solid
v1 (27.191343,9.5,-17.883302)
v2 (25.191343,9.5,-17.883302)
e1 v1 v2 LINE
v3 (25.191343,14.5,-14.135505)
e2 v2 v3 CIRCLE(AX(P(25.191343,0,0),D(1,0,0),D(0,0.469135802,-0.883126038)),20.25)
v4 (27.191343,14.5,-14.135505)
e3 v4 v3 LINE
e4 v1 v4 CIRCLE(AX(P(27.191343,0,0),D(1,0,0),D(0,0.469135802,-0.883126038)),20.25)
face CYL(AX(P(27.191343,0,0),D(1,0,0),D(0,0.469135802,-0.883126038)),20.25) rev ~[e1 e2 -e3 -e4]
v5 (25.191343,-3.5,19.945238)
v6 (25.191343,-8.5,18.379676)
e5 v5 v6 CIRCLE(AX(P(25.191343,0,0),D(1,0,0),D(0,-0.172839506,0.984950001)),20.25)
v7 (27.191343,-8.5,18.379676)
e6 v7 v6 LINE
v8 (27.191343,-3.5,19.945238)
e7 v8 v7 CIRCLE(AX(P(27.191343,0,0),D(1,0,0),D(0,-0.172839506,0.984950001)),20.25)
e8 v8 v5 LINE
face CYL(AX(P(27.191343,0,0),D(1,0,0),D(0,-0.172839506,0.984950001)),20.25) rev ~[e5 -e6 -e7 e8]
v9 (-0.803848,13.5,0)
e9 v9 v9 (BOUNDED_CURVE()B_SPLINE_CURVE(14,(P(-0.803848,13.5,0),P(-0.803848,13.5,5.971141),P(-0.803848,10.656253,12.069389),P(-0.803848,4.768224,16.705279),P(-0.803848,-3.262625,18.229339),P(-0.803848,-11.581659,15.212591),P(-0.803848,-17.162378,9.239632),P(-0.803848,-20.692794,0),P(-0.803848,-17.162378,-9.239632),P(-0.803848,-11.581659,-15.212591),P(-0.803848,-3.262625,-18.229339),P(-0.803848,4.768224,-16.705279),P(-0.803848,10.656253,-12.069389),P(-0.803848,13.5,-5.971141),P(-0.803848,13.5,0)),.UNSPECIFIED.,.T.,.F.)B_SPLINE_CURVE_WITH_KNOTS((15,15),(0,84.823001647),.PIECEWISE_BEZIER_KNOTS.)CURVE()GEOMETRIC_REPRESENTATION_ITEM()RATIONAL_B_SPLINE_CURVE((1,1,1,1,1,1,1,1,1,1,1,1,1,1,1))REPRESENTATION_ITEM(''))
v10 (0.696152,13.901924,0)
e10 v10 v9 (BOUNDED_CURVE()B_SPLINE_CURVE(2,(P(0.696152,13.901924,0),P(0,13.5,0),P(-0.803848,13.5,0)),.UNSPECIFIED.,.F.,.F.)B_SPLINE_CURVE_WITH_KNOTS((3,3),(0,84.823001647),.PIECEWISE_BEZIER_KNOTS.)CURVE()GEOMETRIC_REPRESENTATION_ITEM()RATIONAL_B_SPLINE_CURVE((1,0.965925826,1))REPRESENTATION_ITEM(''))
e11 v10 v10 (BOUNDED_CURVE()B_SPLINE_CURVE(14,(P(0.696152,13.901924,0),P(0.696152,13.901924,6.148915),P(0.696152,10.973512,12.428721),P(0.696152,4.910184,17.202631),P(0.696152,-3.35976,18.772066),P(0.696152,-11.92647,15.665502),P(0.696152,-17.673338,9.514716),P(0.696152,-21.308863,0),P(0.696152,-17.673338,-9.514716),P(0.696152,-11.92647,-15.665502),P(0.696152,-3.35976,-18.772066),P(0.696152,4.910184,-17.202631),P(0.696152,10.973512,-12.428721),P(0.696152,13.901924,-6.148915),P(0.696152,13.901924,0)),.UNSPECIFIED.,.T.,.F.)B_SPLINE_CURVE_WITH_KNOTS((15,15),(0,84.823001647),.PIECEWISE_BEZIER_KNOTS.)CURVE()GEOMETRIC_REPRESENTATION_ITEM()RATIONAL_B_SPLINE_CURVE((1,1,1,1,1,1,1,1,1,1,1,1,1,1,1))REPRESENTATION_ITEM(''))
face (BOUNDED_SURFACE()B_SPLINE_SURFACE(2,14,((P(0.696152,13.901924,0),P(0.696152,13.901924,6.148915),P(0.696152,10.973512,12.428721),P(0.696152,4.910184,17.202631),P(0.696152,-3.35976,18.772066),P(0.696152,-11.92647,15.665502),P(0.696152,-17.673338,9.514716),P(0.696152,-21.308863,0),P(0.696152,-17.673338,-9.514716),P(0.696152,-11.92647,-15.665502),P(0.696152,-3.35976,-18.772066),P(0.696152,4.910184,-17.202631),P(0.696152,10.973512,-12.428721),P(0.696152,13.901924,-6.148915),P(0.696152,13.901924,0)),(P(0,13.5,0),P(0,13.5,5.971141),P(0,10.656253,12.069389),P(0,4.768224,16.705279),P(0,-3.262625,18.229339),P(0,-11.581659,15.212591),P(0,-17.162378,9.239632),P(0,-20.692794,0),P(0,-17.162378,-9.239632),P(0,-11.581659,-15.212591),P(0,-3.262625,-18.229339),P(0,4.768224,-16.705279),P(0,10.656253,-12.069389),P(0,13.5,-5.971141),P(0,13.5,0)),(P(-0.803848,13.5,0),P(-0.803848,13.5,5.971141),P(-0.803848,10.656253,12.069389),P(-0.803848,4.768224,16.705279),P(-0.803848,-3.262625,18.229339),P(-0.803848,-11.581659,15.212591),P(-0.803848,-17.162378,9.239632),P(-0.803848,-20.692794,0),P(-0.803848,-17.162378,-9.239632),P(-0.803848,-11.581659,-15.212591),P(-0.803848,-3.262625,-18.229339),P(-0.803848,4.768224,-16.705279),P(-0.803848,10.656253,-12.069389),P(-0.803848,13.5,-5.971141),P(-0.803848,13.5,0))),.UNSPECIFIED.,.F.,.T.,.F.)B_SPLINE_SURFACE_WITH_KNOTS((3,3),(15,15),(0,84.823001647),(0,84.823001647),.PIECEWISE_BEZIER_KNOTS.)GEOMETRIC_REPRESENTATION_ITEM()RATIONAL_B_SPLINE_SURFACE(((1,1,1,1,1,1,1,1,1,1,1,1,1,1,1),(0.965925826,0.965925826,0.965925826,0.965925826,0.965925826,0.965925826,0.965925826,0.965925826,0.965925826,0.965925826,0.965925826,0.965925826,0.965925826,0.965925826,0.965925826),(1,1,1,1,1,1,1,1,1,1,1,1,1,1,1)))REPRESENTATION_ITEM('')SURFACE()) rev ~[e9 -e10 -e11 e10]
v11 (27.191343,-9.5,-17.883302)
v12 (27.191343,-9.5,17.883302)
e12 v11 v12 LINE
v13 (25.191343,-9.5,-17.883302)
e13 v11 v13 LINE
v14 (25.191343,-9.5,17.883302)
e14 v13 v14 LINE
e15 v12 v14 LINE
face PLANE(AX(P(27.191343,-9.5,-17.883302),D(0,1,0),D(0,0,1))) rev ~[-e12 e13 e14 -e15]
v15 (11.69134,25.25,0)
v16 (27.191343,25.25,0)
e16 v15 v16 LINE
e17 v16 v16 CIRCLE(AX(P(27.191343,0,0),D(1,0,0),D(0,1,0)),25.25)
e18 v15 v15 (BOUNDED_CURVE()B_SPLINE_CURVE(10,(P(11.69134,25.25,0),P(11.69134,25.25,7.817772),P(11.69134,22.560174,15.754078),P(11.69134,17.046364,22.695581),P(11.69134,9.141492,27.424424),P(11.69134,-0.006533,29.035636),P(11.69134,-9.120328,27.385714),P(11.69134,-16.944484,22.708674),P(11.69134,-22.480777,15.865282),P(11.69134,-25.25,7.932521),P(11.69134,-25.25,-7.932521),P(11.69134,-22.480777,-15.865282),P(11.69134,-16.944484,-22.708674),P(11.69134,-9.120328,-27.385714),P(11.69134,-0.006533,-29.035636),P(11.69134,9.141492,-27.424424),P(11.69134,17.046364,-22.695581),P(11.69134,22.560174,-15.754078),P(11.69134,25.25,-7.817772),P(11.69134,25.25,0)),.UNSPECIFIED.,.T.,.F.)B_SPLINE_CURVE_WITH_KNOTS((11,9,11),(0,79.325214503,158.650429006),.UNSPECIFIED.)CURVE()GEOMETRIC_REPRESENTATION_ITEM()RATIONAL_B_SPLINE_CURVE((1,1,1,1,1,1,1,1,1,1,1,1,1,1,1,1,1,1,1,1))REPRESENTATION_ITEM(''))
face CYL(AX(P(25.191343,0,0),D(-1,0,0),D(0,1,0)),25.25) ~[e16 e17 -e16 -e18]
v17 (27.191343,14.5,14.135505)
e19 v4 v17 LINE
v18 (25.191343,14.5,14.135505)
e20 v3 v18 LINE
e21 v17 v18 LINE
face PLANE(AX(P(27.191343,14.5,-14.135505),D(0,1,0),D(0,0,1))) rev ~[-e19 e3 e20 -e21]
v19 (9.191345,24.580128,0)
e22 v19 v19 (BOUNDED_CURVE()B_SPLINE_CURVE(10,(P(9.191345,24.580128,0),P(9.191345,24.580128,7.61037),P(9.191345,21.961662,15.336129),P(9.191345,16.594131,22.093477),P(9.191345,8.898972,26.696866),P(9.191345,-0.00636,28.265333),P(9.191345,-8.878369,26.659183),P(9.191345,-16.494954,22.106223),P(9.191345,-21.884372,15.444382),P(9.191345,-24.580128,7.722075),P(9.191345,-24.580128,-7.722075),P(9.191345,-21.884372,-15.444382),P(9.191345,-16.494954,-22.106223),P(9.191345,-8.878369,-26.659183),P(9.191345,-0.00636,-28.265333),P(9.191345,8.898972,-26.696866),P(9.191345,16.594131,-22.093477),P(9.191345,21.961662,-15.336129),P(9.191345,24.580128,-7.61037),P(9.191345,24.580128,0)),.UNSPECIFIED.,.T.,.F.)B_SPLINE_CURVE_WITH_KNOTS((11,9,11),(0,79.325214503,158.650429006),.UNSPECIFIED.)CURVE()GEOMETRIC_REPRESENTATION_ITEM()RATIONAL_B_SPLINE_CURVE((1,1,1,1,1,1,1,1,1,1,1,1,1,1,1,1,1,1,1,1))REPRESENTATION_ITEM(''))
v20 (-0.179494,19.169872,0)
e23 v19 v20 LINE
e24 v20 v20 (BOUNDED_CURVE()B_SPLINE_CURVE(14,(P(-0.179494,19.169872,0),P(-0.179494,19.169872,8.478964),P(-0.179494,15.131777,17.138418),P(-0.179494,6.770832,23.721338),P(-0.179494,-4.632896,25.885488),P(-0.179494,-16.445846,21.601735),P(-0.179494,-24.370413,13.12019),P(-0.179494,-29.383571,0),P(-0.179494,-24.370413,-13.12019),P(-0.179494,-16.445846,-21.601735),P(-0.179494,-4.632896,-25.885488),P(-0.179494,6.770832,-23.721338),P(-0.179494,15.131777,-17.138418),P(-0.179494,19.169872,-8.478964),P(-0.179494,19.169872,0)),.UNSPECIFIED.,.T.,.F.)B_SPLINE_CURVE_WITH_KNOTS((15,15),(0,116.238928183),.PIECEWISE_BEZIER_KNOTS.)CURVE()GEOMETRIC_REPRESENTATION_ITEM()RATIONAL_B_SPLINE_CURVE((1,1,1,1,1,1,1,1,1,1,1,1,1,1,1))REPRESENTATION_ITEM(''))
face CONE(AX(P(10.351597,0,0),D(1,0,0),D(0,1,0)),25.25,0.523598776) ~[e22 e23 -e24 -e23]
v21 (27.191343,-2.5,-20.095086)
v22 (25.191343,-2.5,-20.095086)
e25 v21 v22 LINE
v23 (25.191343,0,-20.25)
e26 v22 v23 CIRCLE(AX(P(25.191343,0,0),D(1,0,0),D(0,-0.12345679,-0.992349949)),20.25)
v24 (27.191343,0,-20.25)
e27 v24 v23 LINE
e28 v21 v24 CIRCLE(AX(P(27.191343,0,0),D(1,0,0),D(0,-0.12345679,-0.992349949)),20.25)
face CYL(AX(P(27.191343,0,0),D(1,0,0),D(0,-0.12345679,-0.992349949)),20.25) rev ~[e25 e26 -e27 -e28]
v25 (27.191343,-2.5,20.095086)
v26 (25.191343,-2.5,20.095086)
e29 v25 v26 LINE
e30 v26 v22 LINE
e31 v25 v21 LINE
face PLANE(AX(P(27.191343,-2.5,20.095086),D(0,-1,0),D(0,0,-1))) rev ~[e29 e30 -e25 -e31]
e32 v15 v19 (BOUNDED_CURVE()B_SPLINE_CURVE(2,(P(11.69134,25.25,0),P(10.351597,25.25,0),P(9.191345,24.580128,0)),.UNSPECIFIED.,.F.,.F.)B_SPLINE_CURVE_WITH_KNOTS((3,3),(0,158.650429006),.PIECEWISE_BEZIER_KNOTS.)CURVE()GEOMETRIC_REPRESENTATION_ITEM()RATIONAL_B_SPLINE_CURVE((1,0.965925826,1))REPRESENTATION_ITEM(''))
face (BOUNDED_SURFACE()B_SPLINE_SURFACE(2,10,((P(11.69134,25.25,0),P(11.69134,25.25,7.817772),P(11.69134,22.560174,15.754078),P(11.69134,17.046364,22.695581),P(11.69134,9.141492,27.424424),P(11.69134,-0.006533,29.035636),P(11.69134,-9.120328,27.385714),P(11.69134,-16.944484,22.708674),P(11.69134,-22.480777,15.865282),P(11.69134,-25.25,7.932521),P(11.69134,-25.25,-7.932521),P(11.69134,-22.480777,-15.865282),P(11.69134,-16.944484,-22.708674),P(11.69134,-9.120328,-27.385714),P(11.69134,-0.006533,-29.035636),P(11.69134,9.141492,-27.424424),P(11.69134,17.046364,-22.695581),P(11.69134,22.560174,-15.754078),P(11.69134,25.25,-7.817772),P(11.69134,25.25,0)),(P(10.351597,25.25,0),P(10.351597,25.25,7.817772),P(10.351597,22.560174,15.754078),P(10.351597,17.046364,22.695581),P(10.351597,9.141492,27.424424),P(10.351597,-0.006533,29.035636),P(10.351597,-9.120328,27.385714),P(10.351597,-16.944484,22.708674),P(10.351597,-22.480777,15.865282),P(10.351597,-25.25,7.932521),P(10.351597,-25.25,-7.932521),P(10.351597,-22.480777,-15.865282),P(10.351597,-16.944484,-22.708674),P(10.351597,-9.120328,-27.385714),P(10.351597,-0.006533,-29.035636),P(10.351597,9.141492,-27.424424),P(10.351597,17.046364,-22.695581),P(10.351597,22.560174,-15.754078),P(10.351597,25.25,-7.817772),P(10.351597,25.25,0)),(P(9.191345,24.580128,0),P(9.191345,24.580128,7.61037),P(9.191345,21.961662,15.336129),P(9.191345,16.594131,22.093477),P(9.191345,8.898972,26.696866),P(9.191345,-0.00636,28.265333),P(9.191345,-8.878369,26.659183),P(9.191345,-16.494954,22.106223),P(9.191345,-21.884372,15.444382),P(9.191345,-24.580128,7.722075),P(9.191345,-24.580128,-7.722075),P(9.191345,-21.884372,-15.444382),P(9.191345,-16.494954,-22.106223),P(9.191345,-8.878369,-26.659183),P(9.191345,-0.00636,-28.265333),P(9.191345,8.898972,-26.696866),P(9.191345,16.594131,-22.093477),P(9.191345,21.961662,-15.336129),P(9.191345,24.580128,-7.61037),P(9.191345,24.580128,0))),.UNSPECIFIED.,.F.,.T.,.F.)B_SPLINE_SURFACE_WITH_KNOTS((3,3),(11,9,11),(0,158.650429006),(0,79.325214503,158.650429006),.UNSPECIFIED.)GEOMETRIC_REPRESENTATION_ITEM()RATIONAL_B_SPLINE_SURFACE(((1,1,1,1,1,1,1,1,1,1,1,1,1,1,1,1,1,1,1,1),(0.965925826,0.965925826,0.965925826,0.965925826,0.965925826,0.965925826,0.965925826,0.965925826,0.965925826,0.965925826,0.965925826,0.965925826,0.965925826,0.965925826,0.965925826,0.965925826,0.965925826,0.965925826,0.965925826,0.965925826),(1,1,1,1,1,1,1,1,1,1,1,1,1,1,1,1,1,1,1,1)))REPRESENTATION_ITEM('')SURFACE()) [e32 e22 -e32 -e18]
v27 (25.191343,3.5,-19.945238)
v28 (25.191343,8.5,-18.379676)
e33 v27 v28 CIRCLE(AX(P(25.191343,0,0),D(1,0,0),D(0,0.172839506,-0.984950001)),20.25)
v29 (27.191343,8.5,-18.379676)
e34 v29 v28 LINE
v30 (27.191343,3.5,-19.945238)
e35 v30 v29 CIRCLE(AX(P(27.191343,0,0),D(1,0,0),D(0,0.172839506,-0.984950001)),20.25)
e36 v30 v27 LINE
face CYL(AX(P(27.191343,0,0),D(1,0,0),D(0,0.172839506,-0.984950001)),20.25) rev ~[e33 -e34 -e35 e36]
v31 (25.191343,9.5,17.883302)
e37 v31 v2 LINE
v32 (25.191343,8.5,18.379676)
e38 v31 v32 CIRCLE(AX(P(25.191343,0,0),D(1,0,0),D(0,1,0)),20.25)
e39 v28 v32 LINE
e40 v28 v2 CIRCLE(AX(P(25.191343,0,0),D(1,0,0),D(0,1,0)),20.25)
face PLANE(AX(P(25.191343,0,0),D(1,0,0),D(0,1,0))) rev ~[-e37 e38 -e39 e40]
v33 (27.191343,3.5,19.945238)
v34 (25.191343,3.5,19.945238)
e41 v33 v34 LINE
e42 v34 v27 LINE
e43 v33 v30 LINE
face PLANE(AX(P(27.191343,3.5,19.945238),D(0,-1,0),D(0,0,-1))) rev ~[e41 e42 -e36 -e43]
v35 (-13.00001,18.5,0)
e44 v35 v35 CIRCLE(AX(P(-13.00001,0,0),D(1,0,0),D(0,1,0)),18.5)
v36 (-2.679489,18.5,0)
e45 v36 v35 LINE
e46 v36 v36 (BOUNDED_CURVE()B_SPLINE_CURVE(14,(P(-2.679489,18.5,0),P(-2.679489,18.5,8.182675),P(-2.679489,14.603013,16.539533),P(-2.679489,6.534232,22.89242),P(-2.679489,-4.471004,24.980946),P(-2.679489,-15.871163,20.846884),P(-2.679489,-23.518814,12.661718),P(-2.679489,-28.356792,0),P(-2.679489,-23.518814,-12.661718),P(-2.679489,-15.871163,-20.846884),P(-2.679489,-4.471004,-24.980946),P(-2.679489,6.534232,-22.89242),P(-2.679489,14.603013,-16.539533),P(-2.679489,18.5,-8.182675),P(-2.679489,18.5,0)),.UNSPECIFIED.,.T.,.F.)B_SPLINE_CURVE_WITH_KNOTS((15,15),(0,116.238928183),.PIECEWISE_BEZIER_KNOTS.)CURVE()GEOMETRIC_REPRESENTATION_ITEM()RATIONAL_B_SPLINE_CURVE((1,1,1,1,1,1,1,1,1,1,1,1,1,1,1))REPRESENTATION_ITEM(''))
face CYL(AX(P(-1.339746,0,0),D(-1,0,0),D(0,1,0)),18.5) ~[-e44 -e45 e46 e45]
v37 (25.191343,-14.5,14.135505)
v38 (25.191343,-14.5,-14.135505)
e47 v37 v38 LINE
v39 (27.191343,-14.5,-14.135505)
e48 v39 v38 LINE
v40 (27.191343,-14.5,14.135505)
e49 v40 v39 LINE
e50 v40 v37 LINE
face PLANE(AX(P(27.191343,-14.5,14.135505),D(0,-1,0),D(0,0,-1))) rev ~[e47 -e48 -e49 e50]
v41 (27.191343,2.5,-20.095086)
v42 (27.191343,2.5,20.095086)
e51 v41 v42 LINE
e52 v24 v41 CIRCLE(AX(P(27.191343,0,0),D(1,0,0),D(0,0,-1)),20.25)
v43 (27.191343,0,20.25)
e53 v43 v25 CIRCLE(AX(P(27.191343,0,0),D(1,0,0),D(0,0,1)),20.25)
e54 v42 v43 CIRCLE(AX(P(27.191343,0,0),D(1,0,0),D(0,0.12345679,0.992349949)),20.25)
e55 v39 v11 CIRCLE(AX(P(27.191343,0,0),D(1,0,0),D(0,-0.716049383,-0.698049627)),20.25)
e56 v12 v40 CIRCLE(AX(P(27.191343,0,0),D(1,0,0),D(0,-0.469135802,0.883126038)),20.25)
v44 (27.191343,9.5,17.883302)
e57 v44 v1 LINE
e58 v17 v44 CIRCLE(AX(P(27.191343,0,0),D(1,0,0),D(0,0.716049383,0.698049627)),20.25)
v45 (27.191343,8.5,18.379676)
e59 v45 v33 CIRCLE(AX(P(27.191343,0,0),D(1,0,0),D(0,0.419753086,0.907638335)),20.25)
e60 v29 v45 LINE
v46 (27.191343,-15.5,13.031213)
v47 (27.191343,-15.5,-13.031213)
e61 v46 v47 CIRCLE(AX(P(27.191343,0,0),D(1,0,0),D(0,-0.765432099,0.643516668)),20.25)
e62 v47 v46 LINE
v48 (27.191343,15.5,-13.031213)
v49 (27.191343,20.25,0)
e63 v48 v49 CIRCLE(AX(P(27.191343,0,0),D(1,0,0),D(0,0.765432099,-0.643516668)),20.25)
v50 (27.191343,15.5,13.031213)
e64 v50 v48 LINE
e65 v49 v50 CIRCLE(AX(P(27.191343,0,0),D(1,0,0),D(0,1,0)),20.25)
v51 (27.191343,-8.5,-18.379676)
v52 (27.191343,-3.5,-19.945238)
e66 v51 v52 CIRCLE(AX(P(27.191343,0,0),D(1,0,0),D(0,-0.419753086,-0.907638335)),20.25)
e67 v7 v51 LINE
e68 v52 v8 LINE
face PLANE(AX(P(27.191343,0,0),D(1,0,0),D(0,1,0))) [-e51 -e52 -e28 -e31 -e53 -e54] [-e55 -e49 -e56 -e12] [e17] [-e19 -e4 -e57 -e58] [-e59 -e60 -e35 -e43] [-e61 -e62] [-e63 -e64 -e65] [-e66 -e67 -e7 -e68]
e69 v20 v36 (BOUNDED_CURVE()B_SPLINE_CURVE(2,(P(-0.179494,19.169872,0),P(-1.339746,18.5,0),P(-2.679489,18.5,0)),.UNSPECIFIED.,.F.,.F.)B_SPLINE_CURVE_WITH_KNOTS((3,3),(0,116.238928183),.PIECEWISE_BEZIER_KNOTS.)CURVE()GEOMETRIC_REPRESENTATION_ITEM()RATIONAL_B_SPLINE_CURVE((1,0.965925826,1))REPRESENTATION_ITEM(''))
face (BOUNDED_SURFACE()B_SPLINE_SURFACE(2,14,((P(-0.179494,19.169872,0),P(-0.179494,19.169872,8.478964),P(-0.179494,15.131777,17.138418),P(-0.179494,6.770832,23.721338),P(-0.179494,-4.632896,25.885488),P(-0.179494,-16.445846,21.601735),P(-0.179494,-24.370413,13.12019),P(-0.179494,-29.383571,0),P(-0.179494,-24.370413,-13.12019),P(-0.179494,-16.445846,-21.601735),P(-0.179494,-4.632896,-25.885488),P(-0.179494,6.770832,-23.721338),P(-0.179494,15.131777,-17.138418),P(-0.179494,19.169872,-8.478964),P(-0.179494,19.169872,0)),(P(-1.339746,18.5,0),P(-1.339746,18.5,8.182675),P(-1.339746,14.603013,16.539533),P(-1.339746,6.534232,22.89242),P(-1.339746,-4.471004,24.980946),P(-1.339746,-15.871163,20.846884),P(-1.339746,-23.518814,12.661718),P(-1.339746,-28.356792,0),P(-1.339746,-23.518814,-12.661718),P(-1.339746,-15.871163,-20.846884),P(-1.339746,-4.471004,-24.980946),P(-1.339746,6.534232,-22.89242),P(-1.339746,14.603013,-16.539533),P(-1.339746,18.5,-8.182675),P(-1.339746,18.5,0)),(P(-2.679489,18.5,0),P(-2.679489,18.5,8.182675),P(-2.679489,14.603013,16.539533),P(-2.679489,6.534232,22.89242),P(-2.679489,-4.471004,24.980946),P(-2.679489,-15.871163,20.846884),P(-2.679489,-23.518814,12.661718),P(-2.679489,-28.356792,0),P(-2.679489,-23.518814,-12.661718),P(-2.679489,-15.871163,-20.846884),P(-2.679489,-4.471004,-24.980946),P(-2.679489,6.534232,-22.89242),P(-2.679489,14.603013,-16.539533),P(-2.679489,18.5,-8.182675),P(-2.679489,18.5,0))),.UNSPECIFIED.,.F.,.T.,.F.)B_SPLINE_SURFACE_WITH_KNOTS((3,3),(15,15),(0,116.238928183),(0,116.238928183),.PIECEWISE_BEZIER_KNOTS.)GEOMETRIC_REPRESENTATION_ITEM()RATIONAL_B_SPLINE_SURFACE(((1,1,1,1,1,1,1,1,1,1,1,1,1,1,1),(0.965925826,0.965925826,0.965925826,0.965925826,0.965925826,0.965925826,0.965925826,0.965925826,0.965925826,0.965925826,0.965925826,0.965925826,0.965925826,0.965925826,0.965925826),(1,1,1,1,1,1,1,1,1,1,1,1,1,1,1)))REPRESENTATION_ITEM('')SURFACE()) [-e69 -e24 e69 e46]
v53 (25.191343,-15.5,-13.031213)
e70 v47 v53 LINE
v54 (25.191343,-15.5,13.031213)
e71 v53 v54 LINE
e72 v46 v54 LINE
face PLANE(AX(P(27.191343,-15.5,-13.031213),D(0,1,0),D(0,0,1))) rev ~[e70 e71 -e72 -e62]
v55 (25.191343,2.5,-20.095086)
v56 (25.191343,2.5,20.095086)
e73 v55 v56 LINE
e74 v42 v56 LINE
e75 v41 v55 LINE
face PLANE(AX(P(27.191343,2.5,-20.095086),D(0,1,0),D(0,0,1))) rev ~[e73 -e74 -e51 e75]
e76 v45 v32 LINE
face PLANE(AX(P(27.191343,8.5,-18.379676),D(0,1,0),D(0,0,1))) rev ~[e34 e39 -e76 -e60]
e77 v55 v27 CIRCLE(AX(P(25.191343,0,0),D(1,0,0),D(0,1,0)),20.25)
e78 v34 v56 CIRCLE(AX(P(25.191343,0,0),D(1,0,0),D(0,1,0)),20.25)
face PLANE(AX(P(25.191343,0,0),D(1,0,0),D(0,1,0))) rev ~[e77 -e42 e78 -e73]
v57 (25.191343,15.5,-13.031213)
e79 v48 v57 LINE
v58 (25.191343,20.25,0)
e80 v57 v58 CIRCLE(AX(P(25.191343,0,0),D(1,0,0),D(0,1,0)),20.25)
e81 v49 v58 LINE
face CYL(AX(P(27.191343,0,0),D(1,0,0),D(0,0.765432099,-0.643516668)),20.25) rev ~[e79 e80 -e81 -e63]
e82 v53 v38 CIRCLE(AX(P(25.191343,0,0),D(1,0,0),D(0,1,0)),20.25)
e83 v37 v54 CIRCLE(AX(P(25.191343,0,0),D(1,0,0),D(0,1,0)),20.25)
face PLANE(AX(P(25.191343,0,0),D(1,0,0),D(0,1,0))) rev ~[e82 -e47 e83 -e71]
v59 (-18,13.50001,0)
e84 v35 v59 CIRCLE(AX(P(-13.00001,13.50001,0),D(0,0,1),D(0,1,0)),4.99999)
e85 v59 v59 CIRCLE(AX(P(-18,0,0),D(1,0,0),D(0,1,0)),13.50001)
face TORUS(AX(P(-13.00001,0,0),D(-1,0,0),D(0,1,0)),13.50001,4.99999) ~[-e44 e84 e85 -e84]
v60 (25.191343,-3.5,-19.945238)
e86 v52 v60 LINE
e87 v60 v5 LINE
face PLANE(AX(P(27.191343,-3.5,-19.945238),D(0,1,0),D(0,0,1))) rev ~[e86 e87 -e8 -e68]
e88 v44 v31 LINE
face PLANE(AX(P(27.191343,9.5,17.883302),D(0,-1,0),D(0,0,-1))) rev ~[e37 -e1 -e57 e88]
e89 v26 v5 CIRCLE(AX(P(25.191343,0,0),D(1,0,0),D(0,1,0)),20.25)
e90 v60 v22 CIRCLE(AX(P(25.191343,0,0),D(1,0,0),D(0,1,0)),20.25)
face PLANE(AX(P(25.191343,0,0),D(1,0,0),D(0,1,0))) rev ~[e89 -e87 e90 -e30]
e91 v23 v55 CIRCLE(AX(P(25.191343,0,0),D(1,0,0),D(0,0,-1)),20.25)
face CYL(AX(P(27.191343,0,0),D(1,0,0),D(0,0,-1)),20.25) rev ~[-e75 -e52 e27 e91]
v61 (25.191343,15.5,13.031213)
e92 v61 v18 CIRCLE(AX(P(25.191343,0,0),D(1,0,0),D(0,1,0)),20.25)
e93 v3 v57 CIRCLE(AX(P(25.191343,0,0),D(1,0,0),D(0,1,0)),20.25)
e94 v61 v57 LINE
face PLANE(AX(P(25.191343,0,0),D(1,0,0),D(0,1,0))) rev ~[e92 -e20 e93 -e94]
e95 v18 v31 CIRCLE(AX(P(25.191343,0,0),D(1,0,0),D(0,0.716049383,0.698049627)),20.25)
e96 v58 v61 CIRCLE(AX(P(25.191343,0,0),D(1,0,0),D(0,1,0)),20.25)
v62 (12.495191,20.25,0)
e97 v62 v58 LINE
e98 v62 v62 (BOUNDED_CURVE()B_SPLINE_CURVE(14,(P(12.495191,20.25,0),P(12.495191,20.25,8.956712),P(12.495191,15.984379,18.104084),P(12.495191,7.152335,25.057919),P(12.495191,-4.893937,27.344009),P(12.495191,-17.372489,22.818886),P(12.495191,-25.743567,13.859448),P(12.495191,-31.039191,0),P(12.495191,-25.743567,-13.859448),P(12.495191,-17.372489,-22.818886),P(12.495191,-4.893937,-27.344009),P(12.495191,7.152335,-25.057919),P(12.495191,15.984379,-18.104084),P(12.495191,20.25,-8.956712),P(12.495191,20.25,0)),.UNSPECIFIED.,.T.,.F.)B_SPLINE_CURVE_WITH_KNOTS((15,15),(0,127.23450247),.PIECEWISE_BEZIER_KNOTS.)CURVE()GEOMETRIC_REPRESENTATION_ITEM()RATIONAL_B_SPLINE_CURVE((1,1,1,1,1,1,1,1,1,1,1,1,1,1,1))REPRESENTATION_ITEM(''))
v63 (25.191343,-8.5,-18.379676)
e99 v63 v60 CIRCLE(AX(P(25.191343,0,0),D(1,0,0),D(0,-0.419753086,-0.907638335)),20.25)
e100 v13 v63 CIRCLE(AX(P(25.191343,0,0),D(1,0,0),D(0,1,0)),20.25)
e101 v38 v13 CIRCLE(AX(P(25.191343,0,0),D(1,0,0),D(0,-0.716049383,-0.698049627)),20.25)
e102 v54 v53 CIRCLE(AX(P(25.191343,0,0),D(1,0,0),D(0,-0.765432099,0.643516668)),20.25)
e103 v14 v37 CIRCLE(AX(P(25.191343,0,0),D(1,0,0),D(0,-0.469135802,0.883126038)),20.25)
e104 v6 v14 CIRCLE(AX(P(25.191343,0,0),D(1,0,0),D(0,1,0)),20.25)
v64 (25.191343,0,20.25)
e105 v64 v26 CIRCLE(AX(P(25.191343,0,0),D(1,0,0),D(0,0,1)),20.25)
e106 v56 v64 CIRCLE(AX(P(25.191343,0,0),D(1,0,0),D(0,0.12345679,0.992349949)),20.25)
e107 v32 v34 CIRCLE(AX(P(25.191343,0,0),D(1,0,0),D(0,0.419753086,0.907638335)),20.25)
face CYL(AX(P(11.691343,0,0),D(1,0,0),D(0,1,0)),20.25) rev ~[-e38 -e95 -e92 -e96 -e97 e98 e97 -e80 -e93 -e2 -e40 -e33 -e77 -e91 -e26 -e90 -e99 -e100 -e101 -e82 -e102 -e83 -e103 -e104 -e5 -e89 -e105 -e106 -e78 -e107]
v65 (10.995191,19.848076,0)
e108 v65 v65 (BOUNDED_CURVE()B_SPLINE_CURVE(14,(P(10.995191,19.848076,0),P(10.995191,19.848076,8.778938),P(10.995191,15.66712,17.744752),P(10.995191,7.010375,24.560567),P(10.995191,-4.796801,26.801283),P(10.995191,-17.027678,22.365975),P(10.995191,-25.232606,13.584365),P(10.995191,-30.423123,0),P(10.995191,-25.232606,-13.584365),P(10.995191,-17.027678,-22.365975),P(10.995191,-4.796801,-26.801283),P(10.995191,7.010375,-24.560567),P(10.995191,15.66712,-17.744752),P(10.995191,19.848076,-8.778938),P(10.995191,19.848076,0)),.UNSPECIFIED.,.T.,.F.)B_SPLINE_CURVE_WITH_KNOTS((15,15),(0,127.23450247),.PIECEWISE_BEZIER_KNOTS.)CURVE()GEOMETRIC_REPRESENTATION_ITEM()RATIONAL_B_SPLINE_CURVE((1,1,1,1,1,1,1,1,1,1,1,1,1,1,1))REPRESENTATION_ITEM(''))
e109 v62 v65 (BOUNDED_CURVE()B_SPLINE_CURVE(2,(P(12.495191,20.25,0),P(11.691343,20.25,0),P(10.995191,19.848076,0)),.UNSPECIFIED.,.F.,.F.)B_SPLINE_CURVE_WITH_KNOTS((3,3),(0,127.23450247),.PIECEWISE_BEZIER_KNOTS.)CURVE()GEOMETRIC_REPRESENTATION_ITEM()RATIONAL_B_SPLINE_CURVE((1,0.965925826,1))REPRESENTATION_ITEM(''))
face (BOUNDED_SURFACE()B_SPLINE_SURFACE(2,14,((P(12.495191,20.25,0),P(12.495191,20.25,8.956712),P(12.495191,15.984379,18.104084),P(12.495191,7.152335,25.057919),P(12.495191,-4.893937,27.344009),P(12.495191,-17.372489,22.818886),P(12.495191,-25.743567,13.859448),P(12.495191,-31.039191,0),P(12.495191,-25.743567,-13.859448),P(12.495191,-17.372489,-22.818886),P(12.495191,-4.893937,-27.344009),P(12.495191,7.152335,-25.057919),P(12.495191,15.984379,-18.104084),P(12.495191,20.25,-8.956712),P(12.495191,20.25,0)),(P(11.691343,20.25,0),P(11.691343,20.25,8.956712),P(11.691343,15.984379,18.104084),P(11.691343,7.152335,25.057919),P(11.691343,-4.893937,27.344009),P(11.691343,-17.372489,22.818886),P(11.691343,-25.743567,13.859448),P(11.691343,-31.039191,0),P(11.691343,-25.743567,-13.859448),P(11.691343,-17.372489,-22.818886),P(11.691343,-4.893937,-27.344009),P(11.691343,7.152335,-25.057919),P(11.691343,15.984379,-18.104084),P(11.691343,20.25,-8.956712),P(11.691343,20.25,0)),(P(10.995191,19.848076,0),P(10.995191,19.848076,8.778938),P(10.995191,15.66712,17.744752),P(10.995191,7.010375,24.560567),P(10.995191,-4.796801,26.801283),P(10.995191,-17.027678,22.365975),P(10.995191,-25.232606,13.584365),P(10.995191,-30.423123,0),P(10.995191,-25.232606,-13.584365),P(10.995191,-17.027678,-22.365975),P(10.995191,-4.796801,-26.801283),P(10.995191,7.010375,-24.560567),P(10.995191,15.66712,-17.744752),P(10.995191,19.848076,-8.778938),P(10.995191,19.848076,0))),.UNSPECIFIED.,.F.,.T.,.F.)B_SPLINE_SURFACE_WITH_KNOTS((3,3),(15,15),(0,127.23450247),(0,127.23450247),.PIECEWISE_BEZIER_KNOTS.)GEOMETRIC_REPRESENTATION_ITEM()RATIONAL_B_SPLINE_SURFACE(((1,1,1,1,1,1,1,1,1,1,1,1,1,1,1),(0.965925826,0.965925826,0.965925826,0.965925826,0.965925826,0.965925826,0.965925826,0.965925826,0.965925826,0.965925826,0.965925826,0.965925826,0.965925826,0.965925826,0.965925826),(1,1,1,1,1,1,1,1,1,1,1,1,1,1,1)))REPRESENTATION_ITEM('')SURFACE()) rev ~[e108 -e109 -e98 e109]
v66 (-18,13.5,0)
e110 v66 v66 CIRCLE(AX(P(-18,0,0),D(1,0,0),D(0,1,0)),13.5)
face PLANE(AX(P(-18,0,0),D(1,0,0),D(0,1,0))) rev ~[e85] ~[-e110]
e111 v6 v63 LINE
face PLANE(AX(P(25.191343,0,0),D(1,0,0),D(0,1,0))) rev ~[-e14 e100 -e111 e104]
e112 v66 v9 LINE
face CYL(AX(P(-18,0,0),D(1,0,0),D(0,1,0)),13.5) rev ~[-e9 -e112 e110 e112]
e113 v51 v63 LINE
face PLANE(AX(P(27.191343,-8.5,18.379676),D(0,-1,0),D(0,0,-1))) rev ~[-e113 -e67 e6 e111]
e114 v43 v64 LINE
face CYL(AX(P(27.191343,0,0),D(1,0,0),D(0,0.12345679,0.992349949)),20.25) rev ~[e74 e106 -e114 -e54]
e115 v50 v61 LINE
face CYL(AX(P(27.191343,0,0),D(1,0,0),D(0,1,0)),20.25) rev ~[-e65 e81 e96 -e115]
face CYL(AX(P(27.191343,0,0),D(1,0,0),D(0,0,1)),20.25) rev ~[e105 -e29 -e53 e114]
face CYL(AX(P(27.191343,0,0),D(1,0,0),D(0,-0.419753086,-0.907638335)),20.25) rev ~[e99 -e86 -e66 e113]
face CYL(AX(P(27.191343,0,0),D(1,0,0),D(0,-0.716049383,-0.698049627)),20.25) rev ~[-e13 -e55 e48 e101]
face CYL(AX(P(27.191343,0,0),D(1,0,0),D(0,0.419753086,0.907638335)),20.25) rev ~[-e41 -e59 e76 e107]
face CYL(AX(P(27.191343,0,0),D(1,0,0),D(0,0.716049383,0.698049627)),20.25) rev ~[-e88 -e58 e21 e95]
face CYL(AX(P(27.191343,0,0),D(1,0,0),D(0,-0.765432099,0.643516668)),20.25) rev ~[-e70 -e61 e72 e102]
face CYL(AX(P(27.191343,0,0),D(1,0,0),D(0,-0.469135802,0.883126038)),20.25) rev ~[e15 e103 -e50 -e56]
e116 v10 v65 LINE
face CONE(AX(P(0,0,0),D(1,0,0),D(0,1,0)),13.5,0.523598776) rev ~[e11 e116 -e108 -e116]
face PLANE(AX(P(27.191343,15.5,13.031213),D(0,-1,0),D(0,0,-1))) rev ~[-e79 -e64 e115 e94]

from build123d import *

# Parameters (mm, degrees)
F2_R     = 25.25
F3_DEPTH = 2
F5_DEPTH = 2
F6_R     = 4.99999
F7_R     = 3


# Not quite as in the source:
# - a fillet or chamfer is up to 0.001 mm smaller than in the source, because OpenCascade refuses the exact size
# - a feature names something its author has since deleted; it is built from what else it names


with BuildPart() as f1:
    # F0 (on Top) → F1 (revolve)
    with BuildSketch(Plane.XY):
        Polygon((-18, 18.5), (-18, 13.5), (0, 13.5), (11.6913429511, 20.25), (25.1913429511, 20.25), (25.1913429511, 25.25), (10.3515969889, 25.25), (-1.3397459622, 18.5), align=None)
    revolve(axis=Axis((-8.7595172226, 0, 0), (1, 0, 0)))

    # F2 (on face) → F3 (join)
    with BuildSketch(Plane.YZ.offset(25.1913429511)):
        Circle(F2_R)
    extrude(amount=F3_DEPTH)

    # F4 (on face) → F5 (cut, through all)
    with BuildSketch(Plane.YZ.offset(27.1913429511)):
        with BuildLine():
            ThreePointArc((14.5, 14.1355049432), (12.1454310832, 16.2034256811), (9.5, 17.8833022678))
            Line((9.5, 17.8833022678), (9.5, -17.8833022678))
            ThreePointArc((9.5, -17.8833022678), (12.1454310832, -16.2034256811), (14.5, -14.1355049432))
            Line((14.5, -14.1355049432), (14.5, 14.1355049432))
        make_face()
        with BuildLine():
            ThreePointArc((8.5, 18.3796762757), (6.0508466769, 19.3248481105), (3.5, 19.9452375268))
            Line((3.5, 19.9452375268), (3.5, -19.9452375268))
            ThreePointArc((3.5, -19.9452375268), (6.0508466769, -19.3248481105), (8.5, -18.3796762757))
            Line((8.5, -18.3796762757), (8.5, 18.3796762757))
        make_face()
        with BuildLine():
            ThreePointArc((2.5, 20.0950864641), (1.2523975211, 20.2112345108), (0, 20.25))
            ThreePointArc((0, 20.25), (-1.2523975211, 20.2112345108), (-2.5, 20.0950864641))
            Line((-2.5, 20.0950864641), (-2.5, -20.0950864641))
            ThreePointArc((-2.5, -20.0950864641), (-1.2523975211, -20.2112345108), (0, -20.25))
            ThreePointArc((0, -20.25), (1.2523975211, -20.2112345108), (2.5, -20.0950864641))
            Line((2.5, -20.0950864641), (2.5, 20.0950864641))
        make_face()
        with BuildLine():
            Line((-3.5, -19.9452375268), (-3.5, 19.9452375268))
            ThreePointArc((-3.5, 19.9452375268), (-6.0508466769, 19.3248481105), (-8.5, 18.3796762757))
            Line((-8.5, 18.3796762757), (-8.5, -18.3796762757))
            ThreePointArc((-8.5, -18.3796762757), (-6.0508466769, -19.3248481105), (-3.5, -19.9452375268))
        make_face()
        with BuildLine():
            Line((-9.5, -17.8833022678), (-9.5, 17.8833022678))
            ThreePointArc((-9.5, 17.8833022678), (-12.1454310832, 16.2034256811), (-14.5, 14.1355049432))
            Line((-14.5, 14.1355049432), (-14.5, -14.1355049432))
            ThreePointArc((-14.5, -14.1355049432), (-12.1454310832, -16.2034256811), (-9.5, -17.8833022678))
        make_face()
        with BuildLine():
            Line((-15.5, -13.0312125299), (-15.5, 13.0312125299))
            ThreePointArc((-15.5, 13.0312125299), (-20.25, 0), (-15.5, -13.0312125299))
        make_face()
        with BuildLine():
            ThreePointArc((20.25, 0), (19.0254763409, 6.9349657533), (15.5, 13.0312125299))
            Line((15.5, 13.0312125299), (15.5, -13.0312125299))
            ThreePointArc((15.5, -13.0312125299), (19.0254763409, -6.9349657533), (20.25, 0))
        make_face()
    extrude(amount=-F5_DEPTH, mode=Mode.SUBTRACT)

    # F6 (radius 5 in the source; OpenCascade refuses exactly that, so slightly less here)
    f6_edges = [f1.edges().sort_by_distance(p)[0] for p in [
        (-18, -18.5, 0),
        (-1.339746, -18.5, 0),
        (10.351597, -25.25, 0),
    ]]
    fillet(f6_edges, radius=F6_R)

    # F7
    f7_edges = [f1.edges().sort_by_distance(p)[0] for p in [
        (11.691343, -20.25, 0),
        (0, -13.5, 0),
    ]]
    fillet(f7_edges, radius=F7_R)


solid = f1.part
